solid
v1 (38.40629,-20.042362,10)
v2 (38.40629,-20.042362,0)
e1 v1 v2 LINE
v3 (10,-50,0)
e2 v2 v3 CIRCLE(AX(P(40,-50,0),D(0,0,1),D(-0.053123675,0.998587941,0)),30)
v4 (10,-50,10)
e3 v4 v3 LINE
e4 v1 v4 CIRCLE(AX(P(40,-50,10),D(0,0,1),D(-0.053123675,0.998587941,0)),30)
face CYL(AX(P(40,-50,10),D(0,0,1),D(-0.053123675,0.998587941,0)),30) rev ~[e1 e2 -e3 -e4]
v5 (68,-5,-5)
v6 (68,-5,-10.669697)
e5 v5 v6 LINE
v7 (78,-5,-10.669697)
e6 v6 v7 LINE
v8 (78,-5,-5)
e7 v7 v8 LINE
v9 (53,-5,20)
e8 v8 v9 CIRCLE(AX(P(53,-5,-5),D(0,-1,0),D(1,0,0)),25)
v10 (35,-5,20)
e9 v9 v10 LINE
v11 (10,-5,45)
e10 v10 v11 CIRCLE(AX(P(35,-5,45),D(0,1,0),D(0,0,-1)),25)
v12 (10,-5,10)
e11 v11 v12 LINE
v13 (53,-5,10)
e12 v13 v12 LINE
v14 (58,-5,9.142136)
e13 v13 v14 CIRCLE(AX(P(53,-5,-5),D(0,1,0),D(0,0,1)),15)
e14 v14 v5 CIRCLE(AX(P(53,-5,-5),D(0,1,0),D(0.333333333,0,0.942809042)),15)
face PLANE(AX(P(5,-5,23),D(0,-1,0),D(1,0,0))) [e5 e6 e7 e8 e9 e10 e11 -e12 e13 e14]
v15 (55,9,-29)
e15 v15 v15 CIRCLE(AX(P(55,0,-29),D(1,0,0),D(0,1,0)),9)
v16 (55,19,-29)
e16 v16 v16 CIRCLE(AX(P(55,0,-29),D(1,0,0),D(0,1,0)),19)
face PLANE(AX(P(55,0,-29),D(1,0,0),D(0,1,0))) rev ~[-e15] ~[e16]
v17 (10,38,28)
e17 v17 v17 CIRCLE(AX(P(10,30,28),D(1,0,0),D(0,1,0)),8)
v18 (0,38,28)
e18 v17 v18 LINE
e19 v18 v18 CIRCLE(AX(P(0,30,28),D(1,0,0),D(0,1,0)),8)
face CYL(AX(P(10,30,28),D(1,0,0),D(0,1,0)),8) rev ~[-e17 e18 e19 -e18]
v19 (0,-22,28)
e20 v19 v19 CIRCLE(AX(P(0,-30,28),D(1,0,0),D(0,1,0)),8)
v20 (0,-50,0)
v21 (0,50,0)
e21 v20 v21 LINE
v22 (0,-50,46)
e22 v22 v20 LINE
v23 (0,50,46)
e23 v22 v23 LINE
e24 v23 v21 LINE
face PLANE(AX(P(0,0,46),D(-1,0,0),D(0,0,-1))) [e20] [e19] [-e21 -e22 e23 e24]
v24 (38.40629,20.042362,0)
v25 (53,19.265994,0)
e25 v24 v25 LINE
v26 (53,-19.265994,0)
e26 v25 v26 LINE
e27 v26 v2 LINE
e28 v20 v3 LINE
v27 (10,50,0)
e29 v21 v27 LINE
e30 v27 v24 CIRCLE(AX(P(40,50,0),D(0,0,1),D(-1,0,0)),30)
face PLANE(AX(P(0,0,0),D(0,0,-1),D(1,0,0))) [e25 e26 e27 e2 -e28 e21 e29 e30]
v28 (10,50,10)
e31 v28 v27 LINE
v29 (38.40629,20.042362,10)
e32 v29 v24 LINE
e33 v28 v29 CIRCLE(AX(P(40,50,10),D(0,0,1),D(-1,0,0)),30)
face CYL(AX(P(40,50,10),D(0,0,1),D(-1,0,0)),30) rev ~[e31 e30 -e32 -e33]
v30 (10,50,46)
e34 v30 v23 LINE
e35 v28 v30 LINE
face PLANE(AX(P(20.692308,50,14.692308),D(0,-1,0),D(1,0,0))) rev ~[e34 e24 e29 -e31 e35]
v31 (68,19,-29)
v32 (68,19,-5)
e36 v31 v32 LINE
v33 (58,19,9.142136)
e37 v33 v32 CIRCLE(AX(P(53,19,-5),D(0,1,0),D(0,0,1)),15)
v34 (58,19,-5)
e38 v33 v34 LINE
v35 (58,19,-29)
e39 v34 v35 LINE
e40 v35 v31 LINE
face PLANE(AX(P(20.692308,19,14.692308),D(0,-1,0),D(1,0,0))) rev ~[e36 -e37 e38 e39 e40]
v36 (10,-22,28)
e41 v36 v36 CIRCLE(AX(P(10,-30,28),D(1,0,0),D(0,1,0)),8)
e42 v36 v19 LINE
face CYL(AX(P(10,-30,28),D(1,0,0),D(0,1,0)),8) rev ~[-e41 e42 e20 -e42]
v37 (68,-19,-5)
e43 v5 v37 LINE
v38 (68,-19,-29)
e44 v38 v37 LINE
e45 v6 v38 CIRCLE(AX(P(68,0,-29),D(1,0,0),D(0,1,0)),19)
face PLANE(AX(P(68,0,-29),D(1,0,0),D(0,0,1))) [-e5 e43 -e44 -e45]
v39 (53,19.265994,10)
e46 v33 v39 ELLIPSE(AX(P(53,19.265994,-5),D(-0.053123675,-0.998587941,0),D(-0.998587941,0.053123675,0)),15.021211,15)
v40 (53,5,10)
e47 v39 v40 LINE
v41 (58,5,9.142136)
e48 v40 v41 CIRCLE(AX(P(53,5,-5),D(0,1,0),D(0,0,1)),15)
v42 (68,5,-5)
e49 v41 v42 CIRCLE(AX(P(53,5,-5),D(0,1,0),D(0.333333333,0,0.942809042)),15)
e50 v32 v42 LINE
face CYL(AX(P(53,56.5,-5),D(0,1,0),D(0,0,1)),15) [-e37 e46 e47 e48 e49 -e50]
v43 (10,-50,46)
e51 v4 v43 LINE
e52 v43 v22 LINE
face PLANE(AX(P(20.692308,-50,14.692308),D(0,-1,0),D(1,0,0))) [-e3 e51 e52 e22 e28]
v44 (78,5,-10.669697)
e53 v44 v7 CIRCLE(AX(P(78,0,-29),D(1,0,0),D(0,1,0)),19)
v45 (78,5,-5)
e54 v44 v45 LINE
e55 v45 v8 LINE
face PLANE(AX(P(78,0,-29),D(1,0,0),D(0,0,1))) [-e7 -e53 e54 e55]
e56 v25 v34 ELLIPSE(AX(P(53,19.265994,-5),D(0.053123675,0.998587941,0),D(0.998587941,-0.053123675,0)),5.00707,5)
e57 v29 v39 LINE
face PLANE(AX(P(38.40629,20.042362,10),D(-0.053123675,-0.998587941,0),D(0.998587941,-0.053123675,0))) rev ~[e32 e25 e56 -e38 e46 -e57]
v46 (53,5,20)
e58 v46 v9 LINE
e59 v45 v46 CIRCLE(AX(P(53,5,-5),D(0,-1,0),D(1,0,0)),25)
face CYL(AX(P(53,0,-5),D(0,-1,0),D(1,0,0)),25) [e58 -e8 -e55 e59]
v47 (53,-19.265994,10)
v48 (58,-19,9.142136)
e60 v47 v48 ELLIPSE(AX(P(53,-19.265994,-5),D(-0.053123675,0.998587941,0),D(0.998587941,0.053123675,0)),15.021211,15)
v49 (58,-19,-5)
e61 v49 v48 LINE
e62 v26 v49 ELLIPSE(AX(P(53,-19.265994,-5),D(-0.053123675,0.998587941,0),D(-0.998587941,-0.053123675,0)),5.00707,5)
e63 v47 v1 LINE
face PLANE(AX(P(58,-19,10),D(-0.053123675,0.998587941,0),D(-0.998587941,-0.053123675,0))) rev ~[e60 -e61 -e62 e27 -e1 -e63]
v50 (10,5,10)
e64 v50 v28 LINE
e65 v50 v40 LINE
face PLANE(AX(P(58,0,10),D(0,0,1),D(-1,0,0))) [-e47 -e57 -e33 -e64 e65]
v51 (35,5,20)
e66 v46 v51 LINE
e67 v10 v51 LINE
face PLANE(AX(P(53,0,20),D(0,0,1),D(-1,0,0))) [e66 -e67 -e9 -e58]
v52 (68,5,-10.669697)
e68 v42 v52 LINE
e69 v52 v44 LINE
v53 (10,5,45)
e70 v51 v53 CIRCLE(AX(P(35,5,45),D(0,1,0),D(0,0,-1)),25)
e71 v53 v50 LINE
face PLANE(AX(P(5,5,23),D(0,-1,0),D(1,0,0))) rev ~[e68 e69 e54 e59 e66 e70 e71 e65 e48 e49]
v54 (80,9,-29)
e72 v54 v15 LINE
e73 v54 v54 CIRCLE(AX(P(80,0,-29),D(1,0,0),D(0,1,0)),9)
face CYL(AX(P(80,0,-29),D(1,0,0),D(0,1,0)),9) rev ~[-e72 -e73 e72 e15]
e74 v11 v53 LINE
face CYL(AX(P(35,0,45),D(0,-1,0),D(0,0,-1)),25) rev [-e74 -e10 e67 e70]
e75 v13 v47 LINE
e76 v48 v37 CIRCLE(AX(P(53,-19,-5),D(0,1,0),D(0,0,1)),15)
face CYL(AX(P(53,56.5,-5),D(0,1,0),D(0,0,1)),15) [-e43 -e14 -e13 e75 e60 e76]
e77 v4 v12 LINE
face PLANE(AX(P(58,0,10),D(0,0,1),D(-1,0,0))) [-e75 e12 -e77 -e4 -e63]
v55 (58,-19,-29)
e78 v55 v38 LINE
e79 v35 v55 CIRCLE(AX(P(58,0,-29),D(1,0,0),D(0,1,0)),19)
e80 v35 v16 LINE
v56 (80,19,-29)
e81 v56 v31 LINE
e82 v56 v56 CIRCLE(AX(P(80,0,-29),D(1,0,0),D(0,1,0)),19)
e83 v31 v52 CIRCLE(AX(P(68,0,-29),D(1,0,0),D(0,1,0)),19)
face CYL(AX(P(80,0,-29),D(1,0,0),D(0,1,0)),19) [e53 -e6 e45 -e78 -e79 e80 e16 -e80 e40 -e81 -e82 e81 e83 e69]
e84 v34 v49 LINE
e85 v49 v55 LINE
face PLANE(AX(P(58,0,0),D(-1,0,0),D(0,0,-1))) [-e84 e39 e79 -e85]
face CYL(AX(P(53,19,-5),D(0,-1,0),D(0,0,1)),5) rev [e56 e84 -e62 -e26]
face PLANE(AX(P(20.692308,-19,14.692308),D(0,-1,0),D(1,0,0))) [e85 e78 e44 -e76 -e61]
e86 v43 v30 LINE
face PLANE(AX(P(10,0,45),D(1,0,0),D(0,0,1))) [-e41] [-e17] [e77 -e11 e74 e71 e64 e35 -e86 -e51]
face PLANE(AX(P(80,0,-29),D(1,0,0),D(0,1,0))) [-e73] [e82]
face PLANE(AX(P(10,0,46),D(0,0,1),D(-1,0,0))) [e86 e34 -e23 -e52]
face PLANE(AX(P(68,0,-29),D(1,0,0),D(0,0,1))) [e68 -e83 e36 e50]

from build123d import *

# Parameters (mm, degrees)
F1_DEPTH    = 50
F2_DEPTH    = 19
F4_DEPTH    = 10
F5_R        = 5
F6_T1_DEPTH = 113
F7_R        = 8
F8_DEPTH    = 10
F11_W       = 28.4062897359
F11_H       = 10.0000000002
F12_DEPTH   = 5
F10_R       = 9
F13_DEPTH   = 25
F14_DEPTH   = 20


# Not quite as in the source:
# - a fillet or chamfer that OpenCascade refuses, or shapes differently, is made with other operations: its cross-section is extruded or revolved along the edge and cut away or added


with BuildPart() as f1:
    # F0 (on Front) → F1 (new body, symmetric)
    with BuildSketch(Plane.XZ):
        Polygon((0, 46), (0, 0), (58, 0), (58, 10), (10, 10), (10, 46), align=None)
    extrude(amount=F1_DEPTH, both=True)

    # F0 (on Front) → F2 (join, symmetric)
    with BuildSketch(Plane.XZ):
        Polygon((0, 46), (0, 0), (58, 0), (58, 10), (10, 10), (10, 46), align=None)
        Polygon((58, 10), (58, 0), (58, -29), (68, -29), (68, 10), align=None)
    extrude(amount=F2_DEPTH, both=True)

    # F3 (on face) → F4 (cut, through all)
    with BuildSketch(Plane.XY.offset(10)):
        with BuildLine():
            Line((58, -19), (38.4062897359, -20.0423617821))
            ThreePointArc((38.4062897359, -20.0423617821), (18.2306257793, -29.3579471457), (10, -50))
            Line((10, -50), (58, -50))
            Line((58, -50), (58, -19))
        make_face()
        with BuildLine():
            Line((58, 50), (10, 50))
            ThreePointArc((10, 50), (18.2306257793, 29.3579471457), (38.4062897359, 20.0423617821))
            Line((38.4062897359, 20.0423617821), (58, 19))
            Line((58, 19), (58, 50))
        make_face()
    extrude(amount=-F4_DEPTH, mode=Mode.SUBTRACT)

    # F5
    f5_edges = [f1.edges().sort_by_distance(p)[0] for p in [
        (58, 0, 0),
    ]]
    fillet(f5_edges, radius=F5_R)

    # F6: fillet of radius 15 on 1 edges, made by hand

    # F6_s2 → F6_t1 (cut)
    with BuildSketch(Plane.XZ.offset(-56.5)):
        with BuildLine():
            ThreePointArc((53, 10), (63.6066017178, 5.6066017178), (68, -5))
            Line((68, -5), (68, 10))
            Line((68, 10), (53, 10))
        make_face()
    extrude(amount=F6_T1_DEPTH, mode=Mode.SUBTRACT)

    # F7 (on face) → F8 (cut, through all)
    with BuildSketch(Plane.YZ.offset(10)):
        with Locations((-30, 28)):
            Circle(F7_R)
        with Locations((30, 28)):
            Circle(F7_R)
    extrude(amount=-F8_DEPTH, mode=Mode.SUBTRACT)

    # F11 (on Front) → F12 (join, symmetric)
    with BuildSketch(Plane.XZ):
        Polygon((10, 10), (10, 45.0000000683), (10, 46), (0, 46), (0, 0), (10, 0), align=None)
        with BuildLine():
            ThreePointArc((35, 20), (17.3223304462, 27.3223304945), (10, 45.0000000683))
            Line((10, 45.0000000683), (10, 10))
            Line((10, 10), (38.4062897359, 10))
            Line((38.4062897359, 10), (53, 10))
            ThreePointArc((53, 10), (55.5365296809, 9.7839783948), (58, 9.1421356237))
            ThreePointArc((58, 9.1421356237), (65.2474487139, 3.6602540378), (68, -5))
            Line((68, -5), (68, -29))
            Line((68, -29), (78, -29))
            Line((78, -29), (78, -5))
            ThreePointArc((78, -5), (70.6776695297, 12.6776695297), (53, 20))
            Line((53, 20), (35, 20))
        make_face()
        with Locations((24.2031448679, 4.9999999999)):
            Rectangle(F11_W, F11_H)
    extrude(amount=F12_DEPTH, both=True)

    # F10 (on offset) → F13 (join)
    with BuildSketch(Plane.YZ.offset(80)):
        with BuildLine():
            ThreePointArc((-19, -29), (0, -48), (19, -29))
            ThreePointArc((19, -29), (0, -10), (-19, -29))
        make_face()
        with Locations((0, -29)):
            Circle(F10_R, mode=Mode.SUBTRACT)
    extrude(amount=-F13_DEPTH)

    # F14 (cut, through all): faces of the model
    f14_faces = [f1.faces().sort_by_distance(p)[0] for p in [
        (78, 0, -24.7319215604),
        (68, -6.6350234662, -26.0867467093),
        (68, 6.6350234662, -26.0867467093),
    ]]
    extrude(f14_faces, amount=-F14_DEPTH, mode=Mode.SUBTRACT)


solid = f1.part
